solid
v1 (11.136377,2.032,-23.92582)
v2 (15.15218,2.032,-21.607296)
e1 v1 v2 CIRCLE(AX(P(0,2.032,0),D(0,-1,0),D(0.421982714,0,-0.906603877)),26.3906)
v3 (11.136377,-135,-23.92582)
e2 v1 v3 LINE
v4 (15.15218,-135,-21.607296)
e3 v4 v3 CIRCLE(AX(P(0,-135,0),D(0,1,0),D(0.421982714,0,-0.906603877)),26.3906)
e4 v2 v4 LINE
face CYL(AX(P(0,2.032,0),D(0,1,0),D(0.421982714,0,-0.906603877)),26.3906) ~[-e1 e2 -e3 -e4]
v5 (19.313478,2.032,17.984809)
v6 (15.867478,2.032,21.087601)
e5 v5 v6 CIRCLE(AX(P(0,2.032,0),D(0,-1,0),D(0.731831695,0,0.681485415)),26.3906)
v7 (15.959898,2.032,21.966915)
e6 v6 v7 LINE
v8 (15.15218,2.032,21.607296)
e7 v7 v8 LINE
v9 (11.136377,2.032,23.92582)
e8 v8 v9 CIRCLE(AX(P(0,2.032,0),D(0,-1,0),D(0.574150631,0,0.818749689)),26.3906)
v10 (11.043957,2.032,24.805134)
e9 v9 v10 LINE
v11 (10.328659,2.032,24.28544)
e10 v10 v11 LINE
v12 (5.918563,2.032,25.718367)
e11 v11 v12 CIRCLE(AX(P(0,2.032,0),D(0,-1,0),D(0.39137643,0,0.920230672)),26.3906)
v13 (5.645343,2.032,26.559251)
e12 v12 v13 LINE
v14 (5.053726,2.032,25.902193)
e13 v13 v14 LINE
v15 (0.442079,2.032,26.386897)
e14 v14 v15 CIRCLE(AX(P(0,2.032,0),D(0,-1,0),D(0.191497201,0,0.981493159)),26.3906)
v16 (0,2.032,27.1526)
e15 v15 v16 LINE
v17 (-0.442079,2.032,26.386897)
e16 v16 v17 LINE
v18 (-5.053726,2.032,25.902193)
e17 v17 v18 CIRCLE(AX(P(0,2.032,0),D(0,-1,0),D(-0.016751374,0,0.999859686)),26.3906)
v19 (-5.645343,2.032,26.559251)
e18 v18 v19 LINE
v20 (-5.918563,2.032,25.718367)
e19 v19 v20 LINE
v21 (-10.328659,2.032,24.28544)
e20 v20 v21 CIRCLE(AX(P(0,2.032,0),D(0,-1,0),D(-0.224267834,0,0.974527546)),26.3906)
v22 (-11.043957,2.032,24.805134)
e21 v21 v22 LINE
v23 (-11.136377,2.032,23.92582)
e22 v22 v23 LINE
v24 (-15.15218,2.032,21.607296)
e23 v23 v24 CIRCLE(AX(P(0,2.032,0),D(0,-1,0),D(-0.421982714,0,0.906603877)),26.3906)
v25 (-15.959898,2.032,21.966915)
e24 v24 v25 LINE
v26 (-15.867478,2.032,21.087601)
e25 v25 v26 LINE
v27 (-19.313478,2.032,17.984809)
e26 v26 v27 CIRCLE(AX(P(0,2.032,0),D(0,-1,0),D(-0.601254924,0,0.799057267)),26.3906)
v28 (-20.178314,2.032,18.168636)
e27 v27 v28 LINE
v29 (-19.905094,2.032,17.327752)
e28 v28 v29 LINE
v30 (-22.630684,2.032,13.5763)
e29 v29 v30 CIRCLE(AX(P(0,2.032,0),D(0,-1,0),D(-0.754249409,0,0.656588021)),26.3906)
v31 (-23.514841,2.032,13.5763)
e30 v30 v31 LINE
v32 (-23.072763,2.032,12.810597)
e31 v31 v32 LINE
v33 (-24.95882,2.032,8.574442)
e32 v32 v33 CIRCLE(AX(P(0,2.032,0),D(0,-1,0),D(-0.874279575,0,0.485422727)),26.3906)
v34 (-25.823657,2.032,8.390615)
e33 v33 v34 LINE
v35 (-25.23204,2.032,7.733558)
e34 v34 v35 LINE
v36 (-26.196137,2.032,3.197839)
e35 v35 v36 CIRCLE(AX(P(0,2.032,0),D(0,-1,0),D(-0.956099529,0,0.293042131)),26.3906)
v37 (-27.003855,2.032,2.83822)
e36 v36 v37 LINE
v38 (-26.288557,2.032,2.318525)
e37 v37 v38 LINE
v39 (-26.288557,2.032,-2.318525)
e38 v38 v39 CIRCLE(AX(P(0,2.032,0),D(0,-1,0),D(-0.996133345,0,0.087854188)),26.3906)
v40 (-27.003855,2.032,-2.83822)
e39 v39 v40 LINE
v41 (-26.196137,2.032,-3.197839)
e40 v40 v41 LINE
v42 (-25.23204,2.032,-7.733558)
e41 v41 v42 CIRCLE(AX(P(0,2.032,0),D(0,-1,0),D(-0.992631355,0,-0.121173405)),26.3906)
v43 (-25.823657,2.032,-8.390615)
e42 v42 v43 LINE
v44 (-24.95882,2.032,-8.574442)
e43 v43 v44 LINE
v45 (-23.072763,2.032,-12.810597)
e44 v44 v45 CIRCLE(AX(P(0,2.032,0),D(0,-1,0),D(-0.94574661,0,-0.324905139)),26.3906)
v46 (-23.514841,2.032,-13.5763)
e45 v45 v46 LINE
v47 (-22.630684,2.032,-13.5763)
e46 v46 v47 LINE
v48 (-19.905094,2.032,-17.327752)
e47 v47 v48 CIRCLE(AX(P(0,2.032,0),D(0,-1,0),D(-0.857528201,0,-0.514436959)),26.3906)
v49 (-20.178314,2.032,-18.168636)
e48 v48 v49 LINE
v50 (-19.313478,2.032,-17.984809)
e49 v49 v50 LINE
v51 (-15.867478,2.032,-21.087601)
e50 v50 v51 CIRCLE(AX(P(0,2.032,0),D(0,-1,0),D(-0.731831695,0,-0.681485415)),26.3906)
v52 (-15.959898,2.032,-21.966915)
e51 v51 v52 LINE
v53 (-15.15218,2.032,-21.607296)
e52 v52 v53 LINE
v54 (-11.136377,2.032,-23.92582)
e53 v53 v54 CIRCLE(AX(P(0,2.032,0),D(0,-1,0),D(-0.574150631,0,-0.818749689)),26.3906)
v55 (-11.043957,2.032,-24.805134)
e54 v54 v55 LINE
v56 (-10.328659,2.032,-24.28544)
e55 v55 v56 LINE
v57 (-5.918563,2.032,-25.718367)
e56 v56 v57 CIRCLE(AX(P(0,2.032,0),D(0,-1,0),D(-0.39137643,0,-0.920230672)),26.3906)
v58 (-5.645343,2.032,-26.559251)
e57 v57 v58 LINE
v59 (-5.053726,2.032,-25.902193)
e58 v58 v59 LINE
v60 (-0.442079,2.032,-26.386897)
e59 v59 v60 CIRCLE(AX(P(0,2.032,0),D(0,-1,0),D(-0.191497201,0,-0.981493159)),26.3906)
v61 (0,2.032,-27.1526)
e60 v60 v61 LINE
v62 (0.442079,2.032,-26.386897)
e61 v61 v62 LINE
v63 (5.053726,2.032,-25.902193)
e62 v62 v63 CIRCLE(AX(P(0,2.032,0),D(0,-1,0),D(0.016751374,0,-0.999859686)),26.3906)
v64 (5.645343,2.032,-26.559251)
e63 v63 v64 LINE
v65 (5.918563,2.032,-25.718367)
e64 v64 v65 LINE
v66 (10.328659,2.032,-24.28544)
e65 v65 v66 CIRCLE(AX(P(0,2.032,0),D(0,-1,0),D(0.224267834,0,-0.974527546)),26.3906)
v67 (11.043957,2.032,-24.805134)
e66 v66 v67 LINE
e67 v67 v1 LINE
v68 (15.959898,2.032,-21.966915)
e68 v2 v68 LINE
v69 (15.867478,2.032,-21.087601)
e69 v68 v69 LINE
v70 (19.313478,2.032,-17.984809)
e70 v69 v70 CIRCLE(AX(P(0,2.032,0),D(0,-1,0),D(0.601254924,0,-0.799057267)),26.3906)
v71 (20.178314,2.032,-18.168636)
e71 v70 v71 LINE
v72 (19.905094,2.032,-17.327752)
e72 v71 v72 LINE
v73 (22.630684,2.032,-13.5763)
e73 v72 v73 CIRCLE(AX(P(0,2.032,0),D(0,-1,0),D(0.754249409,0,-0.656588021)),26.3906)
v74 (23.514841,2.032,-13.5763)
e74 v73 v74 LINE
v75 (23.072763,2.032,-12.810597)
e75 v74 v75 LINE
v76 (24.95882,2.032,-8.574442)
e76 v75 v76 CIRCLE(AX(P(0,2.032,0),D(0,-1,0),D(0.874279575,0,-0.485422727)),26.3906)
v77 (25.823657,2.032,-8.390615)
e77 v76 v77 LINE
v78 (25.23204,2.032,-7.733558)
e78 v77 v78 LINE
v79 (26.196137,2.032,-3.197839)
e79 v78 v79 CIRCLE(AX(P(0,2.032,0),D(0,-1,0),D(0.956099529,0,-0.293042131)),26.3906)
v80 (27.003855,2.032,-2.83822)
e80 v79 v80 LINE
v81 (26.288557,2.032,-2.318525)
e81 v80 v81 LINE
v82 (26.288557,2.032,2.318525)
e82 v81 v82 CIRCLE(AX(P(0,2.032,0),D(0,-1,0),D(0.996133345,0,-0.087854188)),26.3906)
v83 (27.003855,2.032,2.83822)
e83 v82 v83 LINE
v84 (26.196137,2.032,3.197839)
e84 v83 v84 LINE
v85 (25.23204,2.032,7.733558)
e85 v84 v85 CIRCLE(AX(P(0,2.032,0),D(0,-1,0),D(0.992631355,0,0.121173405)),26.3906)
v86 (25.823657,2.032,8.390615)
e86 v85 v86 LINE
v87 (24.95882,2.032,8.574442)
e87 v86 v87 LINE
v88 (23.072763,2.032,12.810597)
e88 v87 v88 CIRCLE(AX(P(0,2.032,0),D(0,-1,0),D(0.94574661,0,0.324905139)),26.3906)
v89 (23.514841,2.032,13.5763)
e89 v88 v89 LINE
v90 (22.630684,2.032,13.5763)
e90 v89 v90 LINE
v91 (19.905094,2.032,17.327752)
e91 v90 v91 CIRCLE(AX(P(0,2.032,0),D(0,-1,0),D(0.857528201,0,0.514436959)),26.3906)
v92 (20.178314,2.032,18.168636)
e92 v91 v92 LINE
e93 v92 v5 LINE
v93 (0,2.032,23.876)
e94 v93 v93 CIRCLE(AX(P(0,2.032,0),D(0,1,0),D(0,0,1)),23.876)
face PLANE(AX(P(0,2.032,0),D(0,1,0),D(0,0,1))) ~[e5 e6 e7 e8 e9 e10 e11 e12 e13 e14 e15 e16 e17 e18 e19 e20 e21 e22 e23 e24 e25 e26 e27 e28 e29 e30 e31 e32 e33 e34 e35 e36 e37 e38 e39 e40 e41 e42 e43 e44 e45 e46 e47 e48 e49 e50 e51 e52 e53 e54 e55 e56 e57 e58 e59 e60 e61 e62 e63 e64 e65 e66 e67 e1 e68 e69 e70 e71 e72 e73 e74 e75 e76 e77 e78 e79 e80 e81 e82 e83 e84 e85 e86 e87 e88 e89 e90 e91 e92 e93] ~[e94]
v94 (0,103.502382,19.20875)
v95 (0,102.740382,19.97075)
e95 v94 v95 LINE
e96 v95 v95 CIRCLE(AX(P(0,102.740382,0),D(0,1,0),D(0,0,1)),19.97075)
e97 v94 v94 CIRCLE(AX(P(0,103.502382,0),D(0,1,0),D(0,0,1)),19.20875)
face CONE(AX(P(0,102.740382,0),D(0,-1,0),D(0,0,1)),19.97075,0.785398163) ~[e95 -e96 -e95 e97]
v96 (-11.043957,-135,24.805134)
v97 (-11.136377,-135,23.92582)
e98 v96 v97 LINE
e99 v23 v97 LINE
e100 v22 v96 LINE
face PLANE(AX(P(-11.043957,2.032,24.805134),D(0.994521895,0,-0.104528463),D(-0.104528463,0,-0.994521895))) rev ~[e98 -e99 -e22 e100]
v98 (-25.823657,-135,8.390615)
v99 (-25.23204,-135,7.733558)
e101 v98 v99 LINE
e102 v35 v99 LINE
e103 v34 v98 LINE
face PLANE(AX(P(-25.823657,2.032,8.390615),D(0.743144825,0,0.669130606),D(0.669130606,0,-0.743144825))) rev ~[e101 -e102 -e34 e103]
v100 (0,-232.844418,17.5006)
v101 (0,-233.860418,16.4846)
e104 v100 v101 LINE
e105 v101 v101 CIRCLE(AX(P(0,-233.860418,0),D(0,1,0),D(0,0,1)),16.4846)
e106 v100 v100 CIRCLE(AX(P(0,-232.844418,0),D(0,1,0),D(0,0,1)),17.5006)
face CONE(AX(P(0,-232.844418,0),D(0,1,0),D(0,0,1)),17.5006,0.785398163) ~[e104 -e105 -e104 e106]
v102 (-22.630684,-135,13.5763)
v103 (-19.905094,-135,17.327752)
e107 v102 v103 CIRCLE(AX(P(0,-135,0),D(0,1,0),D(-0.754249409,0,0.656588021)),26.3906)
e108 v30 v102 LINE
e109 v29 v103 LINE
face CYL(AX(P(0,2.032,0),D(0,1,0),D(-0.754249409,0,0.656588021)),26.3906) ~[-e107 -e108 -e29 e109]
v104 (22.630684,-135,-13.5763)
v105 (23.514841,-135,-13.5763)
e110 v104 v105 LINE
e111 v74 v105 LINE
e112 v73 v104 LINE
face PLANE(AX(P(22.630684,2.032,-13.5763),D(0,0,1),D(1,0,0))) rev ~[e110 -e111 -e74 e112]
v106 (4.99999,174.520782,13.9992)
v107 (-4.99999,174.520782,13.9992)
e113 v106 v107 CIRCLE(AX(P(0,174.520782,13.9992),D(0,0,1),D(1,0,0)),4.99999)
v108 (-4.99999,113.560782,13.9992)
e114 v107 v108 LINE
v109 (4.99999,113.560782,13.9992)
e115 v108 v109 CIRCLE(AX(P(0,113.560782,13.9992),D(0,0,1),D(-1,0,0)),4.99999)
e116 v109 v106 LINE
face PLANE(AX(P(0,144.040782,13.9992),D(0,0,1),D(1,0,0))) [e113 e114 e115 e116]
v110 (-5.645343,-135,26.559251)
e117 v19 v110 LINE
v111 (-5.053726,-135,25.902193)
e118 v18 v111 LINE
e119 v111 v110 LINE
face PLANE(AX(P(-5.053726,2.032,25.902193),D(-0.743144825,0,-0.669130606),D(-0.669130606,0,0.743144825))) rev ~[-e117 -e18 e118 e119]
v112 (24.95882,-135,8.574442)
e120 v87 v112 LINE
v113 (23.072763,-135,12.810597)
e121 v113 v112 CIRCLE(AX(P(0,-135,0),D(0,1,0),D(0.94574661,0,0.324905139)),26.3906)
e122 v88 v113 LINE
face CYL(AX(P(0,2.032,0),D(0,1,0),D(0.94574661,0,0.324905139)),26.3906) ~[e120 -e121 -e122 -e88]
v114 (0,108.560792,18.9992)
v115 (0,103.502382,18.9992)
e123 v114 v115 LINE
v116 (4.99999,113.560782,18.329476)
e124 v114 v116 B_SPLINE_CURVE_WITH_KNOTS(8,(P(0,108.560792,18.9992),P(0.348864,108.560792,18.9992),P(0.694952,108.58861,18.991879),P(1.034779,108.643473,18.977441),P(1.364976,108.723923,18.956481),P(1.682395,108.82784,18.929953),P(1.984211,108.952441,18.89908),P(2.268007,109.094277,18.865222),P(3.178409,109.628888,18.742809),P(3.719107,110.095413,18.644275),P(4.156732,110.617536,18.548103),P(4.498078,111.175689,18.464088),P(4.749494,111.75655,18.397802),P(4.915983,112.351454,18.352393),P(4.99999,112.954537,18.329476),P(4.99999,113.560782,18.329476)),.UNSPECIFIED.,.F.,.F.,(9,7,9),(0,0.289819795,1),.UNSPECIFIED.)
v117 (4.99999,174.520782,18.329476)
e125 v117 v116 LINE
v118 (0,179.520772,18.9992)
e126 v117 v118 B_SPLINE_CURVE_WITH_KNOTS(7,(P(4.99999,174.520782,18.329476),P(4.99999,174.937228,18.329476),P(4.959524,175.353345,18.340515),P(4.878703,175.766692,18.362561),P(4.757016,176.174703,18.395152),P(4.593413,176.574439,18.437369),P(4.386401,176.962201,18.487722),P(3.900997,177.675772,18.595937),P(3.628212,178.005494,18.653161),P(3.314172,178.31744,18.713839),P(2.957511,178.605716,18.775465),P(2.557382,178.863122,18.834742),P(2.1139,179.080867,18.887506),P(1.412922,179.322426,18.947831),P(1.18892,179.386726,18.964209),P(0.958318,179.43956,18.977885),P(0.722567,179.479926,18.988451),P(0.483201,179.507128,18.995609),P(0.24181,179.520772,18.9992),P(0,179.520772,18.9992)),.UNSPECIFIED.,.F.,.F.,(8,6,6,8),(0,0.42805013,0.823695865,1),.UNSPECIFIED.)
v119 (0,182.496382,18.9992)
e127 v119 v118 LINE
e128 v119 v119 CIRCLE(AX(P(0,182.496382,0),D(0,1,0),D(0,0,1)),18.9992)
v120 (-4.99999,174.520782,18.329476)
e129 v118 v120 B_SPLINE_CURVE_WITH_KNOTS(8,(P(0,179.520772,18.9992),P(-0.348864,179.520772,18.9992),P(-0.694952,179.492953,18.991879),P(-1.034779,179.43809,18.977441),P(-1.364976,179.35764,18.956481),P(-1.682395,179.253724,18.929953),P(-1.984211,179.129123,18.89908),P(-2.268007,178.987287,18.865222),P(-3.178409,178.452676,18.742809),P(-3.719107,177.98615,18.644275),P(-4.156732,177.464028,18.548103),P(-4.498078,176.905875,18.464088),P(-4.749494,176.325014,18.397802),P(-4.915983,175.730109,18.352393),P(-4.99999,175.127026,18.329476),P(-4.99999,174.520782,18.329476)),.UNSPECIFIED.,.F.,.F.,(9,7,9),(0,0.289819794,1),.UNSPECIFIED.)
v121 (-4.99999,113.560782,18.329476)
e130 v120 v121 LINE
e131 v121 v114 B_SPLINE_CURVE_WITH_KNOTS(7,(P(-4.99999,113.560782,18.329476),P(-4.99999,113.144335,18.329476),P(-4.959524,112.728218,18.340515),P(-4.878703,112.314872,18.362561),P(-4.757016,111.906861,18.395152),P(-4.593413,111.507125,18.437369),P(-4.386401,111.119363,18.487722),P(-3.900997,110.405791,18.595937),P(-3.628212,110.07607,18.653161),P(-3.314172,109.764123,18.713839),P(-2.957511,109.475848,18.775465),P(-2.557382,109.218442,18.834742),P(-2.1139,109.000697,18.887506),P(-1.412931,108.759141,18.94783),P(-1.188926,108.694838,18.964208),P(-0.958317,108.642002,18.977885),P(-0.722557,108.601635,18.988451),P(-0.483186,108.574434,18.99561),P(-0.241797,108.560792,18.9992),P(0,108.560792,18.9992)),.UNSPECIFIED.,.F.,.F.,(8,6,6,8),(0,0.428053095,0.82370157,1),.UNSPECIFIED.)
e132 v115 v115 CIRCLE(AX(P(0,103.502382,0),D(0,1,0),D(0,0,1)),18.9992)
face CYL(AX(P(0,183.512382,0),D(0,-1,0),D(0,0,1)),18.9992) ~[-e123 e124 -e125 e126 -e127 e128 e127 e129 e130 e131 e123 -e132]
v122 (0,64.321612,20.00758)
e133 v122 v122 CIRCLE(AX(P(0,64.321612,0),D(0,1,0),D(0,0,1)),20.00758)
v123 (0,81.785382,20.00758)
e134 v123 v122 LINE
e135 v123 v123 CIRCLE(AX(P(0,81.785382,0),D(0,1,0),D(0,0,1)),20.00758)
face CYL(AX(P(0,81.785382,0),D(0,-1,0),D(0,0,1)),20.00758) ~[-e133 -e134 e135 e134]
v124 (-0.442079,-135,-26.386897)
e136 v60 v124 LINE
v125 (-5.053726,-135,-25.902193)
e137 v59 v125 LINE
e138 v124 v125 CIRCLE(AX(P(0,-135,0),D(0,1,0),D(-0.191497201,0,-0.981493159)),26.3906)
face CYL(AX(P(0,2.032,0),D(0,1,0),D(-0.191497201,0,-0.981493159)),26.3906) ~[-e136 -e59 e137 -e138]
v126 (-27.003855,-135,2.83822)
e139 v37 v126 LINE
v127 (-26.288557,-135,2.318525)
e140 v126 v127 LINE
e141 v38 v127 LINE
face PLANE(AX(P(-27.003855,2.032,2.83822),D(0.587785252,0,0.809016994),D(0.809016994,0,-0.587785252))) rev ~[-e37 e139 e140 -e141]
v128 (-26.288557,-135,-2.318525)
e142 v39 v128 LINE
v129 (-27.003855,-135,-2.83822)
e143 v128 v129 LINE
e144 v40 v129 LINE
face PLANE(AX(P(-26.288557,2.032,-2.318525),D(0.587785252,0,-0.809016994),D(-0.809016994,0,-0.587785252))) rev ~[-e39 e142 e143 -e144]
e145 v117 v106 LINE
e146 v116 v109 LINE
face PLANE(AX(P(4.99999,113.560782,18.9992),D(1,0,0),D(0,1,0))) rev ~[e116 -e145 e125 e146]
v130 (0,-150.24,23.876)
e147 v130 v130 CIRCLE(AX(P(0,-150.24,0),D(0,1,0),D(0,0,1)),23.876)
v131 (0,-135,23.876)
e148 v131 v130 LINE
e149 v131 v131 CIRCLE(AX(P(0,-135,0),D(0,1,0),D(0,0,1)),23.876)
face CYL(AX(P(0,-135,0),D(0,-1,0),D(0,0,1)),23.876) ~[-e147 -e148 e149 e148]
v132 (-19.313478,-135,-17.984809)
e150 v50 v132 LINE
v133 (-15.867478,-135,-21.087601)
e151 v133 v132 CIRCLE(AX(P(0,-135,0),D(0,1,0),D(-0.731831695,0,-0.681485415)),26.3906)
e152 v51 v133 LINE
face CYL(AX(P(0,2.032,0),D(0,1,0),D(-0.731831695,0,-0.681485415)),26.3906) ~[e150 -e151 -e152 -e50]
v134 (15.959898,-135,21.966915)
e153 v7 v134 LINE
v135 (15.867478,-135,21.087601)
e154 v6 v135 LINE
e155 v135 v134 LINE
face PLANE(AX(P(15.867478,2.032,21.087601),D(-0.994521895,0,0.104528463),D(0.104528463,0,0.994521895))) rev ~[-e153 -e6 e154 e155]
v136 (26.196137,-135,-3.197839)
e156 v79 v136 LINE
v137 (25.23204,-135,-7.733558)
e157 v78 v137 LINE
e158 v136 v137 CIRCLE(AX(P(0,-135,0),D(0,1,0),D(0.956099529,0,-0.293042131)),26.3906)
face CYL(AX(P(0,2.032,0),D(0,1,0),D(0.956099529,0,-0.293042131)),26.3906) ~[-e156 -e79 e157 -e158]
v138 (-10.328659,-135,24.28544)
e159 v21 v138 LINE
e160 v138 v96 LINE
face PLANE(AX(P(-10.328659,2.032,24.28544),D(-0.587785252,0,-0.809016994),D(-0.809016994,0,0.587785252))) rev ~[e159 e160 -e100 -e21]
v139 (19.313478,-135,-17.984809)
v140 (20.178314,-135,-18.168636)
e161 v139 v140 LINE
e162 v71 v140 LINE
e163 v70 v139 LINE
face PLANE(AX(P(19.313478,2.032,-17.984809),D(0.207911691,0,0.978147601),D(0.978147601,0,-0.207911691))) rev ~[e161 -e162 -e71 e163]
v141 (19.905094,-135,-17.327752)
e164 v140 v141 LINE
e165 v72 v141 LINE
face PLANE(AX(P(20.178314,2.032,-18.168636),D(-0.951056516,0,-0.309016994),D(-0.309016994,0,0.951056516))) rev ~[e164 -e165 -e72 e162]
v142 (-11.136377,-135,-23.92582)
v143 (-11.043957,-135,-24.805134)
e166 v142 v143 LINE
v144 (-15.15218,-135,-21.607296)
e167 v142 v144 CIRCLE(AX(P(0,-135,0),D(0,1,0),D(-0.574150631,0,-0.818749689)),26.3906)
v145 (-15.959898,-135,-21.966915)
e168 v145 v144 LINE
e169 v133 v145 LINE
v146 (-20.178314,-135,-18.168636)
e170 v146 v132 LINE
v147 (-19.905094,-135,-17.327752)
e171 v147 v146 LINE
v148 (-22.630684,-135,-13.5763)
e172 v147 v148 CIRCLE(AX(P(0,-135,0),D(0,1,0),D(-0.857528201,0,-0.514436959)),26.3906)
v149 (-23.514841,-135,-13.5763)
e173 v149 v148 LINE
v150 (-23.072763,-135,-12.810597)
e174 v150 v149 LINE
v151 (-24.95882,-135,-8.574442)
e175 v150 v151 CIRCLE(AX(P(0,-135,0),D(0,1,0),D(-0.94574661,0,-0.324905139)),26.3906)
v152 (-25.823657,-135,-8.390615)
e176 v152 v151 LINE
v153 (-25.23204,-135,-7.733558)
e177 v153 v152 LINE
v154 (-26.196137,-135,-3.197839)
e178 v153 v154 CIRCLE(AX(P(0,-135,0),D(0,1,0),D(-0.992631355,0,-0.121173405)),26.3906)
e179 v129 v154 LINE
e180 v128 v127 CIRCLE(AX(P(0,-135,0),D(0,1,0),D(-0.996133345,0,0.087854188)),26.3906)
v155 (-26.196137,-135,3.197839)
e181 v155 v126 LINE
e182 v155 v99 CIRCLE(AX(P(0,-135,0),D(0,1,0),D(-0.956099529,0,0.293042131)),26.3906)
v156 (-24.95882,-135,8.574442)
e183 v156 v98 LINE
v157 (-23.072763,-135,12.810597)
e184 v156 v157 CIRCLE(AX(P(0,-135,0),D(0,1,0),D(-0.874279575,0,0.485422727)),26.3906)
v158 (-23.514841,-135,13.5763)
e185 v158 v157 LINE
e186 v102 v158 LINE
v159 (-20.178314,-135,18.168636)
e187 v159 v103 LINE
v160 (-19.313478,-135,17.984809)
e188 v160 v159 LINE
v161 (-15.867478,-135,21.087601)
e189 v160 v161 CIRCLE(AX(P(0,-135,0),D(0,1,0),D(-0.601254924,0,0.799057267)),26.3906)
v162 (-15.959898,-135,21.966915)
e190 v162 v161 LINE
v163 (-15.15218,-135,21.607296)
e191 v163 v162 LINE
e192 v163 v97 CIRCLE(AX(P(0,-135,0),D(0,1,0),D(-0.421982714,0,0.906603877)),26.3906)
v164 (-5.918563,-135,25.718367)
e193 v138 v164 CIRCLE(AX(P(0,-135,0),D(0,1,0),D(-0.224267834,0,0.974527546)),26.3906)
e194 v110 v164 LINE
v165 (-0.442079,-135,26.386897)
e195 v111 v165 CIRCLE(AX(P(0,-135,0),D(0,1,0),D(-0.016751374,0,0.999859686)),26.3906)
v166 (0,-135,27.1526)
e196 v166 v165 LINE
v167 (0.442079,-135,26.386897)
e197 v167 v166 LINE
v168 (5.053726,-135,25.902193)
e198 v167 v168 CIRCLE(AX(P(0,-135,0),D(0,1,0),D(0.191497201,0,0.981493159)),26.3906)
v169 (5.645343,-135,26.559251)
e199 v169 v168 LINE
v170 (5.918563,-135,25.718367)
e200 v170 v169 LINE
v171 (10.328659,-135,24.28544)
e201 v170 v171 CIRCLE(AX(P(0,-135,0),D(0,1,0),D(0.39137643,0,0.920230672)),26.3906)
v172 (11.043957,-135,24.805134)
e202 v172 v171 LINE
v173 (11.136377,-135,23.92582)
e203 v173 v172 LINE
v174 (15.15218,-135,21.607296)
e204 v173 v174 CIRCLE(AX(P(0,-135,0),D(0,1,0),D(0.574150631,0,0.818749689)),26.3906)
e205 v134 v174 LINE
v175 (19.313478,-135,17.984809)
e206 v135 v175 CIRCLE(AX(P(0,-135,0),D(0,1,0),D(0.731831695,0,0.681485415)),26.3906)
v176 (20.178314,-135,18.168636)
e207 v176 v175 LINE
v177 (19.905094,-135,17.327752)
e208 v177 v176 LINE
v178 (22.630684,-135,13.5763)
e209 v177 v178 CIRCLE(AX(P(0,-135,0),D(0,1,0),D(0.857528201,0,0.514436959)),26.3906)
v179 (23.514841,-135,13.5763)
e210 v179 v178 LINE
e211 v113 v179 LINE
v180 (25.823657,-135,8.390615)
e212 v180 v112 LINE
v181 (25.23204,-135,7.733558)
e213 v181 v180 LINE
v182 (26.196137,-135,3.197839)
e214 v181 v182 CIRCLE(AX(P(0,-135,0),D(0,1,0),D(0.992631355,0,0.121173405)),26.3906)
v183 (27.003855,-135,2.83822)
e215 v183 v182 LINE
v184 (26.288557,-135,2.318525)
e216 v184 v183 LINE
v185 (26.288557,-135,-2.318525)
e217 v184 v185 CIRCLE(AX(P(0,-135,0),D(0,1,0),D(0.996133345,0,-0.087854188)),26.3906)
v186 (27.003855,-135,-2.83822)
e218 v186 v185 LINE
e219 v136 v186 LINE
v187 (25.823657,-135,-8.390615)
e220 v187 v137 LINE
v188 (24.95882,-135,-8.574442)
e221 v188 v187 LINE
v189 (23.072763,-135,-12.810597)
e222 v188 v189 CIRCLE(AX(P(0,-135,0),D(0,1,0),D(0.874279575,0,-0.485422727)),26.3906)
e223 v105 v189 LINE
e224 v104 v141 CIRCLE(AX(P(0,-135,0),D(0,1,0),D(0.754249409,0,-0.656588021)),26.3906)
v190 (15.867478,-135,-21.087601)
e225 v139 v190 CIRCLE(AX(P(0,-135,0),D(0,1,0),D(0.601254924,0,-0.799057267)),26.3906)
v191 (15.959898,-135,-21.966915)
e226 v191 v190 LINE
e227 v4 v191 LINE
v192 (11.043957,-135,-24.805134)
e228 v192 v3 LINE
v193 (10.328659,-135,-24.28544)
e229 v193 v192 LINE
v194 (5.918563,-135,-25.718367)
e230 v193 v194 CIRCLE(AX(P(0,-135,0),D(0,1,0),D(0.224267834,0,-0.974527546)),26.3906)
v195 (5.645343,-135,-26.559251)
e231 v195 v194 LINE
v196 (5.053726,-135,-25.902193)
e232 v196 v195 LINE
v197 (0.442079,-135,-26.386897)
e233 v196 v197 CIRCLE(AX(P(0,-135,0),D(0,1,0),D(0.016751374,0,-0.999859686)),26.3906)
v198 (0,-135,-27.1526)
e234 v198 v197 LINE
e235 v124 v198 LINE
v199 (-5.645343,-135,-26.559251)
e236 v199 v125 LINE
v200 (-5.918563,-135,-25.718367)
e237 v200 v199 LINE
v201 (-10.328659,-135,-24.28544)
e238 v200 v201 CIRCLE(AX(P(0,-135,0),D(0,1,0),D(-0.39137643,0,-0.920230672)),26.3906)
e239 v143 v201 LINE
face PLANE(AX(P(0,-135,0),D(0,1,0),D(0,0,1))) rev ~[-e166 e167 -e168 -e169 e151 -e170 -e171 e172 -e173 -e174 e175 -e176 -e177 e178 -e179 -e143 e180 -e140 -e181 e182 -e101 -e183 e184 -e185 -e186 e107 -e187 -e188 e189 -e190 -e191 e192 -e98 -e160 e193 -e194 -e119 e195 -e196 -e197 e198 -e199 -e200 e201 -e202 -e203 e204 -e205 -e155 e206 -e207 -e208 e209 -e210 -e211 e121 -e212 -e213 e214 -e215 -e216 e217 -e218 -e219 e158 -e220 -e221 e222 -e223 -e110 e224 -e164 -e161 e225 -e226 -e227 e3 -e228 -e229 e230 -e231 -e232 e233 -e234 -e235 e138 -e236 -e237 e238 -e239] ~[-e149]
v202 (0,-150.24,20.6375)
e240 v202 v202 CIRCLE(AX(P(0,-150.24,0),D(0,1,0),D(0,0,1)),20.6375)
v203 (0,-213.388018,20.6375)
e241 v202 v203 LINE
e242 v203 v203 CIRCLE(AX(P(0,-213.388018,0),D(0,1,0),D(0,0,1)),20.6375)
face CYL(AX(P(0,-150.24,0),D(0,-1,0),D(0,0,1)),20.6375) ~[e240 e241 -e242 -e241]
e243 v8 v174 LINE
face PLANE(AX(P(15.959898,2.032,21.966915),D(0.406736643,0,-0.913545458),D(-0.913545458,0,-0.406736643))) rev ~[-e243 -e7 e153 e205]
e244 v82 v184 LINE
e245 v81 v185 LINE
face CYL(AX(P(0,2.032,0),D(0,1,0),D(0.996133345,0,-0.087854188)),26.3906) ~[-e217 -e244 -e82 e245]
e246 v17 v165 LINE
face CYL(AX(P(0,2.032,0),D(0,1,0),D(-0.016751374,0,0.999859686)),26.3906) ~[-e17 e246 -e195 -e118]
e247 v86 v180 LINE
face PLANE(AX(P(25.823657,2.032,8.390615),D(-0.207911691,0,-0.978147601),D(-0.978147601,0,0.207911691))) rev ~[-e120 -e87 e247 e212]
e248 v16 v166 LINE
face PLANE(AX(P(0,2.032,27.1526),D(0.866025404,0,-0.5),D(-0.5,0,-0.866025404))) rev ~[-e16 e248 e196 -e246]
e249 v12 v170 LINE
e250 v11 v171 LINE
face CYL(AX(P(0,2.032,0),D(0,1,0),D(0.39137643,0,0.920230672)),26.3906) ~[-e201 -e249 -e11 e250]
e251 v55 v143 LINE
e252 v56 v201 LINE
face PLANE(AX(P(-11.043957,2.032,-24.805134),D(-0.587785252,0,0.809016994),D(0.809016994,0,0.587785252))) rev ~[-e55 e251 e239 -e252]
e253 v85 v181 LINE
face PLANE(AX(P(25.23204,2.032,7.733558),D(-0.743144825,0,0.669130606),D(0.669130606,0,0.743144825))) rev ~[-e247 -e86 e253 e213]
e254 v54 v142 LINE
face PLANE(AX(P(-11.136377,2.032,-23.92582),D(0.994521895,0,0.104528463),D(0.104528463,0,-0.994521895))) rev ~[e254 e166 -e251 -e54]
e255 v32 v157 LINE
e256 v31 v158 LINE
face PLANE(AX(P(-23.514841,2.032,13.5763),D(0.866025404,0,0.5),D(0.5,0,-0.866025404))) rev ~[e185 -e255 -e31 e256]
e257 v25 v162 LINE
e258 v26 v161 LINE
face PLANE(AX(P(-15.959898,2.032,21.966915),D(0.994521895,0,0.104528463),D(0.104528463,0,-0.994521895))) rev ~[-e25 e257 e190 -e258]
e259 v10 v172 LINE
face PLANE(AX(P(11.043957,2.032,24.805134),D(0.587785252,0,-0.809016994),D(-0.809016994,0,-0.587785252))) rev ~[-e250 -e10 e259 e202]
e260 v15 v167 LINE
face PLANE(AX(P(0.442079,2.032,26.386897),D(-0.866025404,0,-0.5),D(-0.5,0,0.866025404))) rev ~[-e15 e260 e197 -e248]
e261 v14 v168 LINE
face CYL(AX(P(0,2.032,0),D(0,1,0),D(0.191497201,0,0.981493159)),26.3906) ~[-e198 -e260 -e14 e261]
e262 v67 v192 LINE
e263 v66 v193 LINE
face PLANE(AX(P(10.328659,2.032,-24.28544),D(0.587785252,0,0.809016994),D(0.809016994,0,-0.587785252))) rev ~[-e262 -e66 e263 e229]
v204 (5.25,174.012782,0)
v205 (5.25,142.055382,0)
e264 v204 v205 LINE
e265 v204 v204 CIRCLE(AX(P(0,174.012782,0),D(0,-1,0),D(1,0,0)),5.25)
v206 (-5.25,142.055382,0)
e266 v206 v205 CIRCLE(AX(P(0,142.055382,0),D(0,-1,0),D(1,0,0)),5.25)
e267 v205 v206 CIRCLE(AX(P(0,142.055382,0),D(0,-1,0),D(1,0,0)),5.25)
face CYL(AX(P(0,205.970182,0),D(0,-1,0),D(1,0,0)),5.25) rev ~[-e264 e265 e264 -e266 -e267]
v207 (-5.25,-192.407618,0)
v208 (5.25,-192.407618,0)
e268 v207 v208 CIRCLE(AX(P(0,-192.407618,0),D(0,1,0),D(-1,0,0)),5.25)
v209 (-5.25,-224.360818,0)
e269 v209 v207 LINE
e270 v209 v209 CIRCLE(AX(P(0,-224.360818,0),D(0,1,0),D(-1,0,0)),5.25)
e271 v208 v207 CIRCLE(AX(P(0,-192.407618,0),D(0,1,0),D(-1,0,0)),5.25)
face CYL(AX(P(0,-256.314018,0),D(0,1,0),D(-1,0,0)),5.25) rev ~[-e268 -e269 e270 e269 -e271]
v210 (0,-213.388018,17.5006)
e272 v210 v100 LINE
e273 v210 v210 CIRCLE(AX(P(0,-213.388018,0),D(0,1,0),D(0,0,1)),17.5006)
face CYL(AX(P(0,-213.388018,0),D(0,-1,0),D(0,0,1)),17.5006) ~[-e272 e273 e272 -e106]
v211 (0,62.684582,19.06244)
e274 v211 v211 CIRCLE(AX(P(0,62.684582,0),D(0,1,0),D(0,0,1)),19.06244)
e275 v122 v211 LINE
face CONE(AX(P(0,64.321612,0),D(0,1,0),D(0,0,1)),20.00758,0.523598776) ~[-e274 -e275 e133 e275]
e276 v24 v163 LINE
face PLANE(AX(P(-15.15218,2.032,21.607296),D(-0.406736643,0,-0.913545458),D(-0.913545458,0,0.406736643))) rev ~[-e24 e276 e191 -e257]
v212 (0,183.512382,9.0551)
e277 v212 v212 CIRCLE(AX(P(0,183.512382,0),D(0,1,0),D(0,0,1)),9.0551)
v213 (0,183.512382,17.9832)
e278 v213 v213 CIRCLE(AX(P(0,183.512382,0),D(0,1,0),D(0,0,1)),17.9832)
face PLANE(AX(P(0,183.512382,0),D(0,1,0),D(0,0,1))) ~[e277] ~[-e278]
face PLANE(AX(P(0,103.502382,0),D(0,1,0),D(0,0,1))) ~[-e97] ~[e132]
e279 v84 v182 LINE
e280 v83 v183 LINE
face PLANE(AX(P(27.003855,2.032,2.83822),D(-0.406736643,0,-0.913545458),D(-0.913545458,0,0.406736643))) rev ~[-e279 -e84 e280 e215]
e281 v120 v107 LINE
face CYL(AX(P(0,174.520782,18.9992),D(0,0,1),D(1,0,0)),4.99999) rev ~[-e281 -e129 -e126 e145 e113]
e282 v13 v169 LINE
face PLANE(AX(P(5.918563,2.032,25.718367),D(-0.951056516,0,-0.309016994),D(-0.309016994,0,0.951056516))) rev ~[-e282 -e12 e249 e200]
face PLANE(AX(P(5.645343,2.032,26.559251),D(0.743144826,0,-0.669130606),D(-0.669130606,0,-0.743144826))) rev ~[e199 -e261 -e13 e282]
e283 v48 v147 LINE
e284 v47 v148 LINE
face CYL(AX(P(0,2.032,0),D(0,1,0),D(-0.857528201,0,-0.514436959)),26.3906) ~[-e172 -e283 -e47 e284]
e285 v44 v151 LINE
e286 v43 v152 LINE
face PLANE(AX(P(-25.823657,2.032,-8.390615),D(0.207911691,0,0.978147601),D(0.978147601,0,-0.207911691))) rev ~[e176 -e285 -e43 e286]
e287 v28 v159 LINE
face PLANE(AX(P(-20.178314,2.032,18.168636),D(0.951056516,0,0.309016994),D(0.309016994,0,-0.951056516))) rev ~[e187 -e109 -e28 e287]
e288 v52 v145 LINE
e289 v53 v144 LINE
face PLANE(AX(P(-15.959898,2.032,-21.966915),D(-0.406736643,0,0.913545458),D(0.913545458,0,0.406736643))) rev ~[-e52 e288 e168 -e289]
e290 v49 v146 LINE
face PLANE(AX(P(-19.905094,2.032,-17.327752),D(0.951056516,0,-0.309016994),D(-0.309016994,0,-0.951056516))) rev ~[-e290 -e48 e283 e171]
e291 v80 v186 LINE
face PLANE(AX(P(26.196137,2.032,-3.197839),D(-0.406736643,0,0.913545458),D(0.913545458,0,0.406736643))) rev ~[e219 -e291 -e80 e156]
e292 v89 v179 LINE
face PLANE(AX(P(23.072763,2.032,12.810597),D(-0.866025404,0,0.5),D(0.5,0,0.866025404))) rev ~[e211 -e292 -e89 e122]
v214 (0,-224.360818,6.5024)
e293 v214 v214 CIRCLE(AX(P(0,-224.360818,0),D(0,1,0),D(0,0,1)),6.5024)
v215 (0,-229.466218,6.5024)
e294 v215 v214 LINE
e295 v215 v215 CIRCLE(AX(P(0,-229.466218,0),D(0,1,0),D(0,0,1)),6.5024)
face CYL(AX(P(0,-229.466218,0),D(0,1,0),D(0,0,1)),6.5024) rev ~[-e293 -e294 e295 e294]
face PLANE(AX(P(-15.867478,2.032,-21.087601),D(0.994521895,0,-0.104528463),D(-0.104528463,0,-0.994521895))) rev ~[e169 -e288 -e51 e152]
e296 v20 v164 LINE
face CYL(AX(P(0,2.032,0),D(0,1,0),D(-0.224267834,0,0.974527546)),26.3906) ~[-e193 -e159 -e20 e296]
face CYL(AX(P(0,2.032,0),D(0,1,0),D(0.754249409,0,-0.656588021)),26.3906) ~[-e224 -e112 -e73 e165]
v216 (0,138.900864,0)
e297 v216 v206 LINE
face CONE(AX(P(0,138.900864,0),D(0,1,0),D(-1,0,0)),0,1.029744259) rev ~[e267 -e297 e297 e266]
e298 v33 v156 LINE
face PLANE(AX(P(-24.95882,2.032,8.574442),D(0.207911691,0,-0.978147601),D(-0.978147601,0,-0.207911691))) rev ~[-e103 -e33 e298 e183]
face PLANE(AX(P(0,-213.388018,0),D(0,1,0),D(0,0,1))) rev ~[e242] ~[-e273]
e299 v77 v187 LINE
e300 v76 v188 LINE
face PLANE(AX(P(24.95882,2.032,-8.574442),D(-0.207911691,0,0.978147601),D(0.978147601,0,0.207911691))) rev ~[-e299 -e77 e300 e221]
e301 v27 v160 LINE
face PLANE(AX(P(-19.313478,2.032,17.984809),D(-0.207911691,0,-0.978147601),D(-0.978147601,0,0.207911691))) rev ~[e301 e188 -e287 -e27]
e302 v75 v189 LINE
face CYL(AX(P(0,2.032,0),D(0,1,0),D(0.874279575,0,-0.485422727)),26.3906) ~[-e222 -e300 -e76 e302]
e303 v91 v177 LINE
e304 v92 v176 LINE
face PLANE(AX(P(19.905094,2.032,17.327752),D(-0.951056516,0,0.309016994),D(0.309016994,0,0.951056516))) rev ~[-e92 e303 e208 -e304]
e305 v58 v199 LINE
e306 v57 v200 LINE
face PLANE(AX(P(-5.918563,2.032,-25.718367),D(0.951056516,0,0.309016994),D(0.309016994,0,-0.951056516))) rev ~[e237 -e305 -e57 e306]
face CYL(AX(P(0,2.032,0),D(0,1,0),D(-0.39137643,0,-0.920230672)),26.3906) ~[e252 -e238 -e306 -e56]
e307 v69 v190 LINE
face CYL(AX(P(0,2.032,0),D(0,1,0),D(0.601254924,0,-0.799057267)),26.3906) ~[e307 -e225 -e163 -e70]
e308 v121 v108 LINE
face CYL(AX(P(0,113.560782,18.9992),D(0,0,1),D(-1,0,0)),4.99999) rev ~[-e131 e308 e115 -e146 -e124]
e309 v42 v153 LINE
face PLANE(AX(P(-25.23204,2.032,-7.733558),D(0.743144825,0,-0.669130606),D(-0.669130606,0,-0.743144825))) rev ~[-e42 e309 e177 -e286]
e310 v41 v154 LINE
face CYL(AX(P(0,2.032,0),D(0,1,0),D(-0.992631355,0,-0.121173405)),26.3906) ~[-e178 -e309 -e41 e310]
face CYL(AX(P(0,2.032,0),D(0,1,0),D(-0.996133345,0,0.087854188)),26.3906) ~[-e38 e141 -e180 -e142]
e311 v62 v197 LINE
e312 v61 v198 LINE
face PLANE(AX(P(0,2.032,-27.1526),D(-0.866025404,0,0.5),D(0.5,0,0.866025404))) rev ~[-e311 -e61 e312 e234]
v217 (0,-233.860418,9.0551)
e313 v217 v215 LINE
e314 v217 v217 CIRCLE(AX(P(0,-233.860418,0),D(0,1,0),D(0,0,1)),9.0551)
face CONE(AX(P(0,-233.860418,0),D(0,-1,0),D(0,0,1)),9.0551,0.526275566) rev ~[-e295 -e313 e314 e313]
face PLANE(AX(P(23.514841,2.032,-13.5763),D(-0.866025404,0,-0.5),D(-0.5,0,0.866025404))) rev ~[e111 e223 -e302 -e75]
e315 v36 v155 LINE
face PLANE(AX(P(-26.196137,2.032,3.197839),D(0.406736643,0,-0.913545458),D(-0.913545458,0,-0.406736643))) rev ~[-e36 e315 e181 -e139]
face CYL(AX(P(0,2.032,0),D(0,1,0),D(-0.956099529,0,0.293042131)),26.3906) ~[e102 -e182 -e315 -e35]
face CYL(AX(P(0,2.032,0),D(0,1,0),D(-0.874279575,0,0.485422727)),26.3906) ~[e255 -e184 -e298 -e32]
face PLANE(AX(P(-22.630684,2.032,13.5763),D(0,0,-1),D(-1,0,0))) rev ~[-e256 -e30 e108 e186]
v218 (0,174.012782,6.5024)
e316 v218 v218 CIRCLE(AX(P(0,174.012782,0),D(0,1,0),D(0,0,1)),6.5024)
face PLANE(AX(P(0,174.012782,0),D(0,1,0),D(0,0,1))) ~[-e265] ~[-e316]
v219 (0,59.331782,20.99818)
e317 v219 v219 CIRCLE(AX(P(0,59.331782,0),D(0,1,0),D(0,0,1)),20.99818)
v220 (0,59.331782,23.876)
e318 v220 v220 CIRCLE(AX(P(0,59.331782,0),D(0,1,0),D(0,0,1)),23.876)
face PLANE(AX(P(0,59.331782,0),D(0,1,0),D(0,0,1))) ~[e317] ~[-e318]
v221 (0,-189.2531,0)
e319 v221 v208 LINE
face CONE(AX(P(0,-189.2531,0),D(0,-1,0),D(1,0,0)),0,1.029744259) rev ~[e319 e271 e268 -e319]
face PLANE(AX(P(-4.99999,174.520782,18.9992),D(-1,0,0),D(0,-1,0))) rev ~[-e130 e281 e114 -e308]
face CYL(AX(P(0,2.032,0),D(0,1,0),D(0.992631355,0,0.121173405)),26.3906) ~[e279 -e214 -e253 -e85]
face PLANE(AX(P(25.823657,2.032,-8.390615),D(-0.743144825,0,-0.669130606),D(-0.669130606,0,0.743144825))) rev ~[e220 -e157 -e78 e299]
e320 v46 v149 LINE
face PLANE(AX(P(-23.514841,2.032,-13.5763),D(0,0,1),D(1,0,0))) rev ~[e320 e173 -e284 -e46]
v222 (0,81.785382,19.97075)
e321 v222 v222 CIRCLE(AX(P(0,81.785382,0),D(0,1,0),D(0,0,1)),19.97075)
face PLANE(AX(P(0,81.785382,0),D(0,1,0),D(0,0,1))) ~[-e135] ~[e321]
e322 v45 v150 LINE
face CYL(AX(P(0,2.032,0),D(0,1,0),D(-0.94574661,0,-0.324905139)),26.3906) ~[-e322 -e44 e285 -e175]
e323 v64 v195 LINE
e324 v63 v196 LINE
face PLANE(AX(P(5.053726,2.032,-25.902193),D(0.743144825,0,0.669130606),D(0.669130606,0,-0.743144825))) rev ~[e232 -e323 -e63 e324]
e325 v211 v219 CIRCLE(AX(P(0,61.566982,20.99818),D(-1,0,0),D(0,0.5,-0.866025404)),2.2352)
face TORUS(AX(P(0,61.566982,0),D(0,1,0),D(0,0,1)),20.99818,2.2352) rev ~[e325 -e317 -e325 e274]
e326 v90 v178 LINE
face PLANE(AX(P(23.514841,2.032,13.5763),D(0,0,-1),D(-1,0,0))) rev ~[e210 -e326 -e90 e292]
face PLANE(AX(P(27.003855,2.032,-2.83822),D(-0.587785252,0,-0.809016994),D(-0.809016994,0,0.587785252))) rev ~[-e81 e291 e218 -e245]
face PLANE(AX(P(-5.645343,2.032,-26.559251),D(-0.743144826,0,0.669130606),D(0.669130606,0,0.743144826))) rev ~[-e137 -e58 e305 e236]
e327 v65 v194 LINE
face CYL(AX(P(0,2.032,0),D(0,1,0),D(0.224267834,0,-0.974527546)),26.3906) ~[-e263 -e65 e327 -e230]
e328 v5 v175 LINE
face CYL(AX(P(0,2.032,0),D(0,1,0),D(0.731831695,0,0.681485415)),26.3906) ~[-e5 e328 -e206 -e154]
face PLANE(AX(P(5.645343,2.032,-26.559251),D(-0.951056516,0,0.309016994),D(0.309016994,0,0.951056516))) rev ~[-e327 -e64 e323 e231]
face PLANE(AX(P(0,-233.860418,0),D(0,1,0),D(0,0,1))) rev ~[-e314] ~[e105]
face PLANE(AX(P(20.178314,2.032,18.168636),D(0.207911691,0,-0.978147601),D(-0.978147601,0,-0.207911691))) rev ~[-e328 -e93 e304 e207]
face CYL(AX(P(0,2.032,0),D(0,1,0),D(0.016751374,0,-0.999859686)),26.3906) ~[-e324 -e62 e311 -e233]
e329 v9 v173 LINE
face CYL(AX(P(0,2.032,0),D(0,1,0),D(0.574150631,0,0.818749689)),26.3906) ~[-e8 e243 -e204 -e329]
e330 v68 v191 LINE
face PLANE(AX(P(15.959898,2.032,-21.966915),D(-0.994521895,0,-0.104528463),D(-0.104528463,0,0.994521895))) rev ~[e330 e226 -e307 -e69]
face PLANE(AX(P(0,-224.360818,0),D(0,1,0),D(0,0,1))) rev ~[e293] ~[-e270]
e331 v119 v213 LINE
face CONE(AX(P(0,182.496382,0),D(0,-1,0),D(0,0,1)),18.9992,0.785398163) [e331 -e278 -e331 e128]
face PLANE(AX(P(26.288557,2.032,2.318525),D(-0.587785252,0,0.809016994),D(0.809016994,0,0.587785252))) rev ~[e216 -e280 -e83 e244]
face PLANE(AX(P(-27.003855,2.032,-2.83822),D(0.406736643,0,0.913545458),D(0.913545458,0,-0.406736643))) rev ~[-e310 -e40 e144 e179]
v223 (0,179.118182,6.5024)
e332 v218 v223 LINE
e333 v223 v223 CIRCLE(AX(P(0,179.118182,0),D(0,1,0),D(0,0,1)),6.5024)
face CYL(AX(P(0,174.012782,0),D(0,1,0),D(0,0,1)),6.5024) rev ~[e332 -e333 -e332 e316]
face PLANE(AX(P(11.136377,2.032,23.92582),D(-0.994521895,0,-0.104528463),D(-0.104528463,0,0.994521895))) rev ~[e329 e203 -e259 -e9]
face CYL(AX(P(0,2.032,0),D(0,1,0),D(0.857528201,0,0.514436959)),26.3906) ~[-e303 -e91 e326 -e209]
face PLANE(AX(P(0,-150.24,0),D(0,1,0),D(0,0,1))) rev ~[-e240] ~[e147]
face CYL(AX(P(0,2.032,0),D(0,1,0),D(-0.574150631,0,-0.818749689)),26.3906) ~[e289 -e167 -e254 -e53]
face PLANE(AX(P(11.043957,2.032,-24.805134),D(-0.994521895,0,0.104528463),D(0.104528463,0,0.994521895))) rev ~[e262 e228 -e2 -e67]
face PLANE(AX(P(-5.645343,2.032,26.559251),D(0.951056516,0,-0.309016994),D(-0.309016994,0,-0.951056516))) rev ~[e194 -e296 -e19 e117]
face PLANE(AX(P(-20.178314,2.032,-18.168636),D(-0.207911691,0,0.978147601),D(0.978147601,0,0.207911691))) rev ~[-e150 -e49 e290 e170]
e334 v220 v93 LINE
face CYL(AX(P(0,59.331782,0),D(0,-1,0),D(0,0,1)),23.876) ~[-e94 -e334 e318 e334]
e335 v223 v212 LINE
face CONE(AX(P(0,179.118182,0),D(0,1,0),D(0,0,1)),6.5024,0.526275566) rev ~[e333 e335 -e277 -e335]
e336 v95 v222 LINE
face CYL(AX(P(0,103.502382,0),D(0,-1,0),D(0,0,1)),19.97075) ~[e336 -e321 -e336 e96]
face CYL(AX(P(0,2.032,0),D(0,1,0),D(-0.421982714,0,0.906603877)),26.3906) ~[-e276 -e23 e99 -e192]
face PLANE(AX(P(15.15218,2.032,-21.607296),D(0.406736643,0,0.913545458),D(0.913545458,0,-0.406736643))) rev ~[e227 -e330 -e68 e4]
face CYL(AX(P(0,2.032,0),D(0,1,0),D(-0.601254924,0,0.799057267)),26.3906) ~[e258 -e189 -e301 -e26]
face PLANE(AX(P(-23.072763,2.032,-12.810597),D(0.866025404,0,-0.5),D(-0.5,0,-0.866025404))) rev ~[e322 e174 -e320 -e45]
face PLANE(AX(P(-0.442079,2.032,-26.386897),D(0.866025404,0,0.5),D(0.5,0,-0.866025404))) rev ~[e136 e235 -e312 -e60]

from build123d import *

# Parameters (mm, degrees)
F3_DEPTH        = 235.8934182005
F3_COPIES_COUNT = 30
F6_DEPTH        = 5
F7_SIZE         = 1.016
F10_D           = 10.5
F10_DEPTH       = 31.9574
F10_TIP         = 3.1545182499
F11_SIZE        = 0.762
F14_D           = 10.5
F14_DEPTH       = 31.9532
F14_TIP         = 3.1545182499


# Not quite as in the source:
# - a pattern or mirror of a feature is missing from the dataset's text; its kind, count and spacing are read off the source's solid


with BuildPart() as f1:
    # F0 (on Right) → F1 (revolve)
    with BuildSketch(Plane.YZ):
        with BuildLine():
            Line((59.3317817995, 23.876), (2.032, 23.876))
            Line((2.032, 23.876), (2.032, 27.1526))
            Line((2.032, 27.1526), (0, 27.1526))
            Line((0, 27.1526), (-135, 27.1526))
            Line((-135, 27.1526), (-135, 23.876))
            Line((-135, 23.876), (-150.24, 23.876))
            Line((-150.24, 23.876), (-150.24, 20.6375))
            Line((-150.24, 20.6375), (-213.3880182005, 20.6375))
            Line((-213.3880182005, 20.6375), (-213.3880182005, 17.5006))
            Line((-213.3880182005, 17.5006), (-233.8604182005, 17.5006))
            Line((-233.8604182005, 17.5006), (-233.8604182005, 9.0551))
            Line((-233.8604182005, 9.0551), (-229.4662182005, 6.5024))
            Line((-229.4662182005, 6.5024), (-224.3608182005, 6.5024))
            Line((-224.3608182005, 6.5024), (-224.3608182005, 0))
            Line((-224.3608182005, 0), (174.0127817995, 0))
            Line((174.0127817995, 0), (174.0127817995, 6.5024))
            Line((174.0127817995, 6.5024), (179.1181817995, 6.5024))
            Line((179.1181817995, 6.5024), (183.5123817995, 9.0551))
            Line((183.5123817995, 9.0551), (183.5123817995, 18.9992))
            Line((183.5123817995, 18.9992), (103.5023817995, 18.9992))
            Line((103.5023817995, 18.9992), (103.5023817995, 19.97075))
            Line((103.5023817995, 19.97075), (81.7853817995, 19.97075))
            Line((81.7853817995, 19.97075), (81.7853817995, 20.00758))
            Line((81.7853817995, 20.00758), (64.3216122695, 20.00758))
            Line((64.3216122695, 20.00758), (62.6845817995, 19.0624400175))
            ThreePointArc((62.6845817995, 19.0624400175), (60.4493817995, 19.0624400175), (59.3317817995, 20.99818))
            Line((59.3317817995, 20.99818), (59.3317817995, 23.876))
        make_face()
    revolve(axis=Axis((0, -25.1740182005, 0), (0, 1, 0)))

    # F2 (on face) → F3 (cut, through all)
    with BuildSketch(Plane(origin=(0, 2.032, 0), x_dir=(-1, 0, 0), z_dir=(0, 1, 0))):
        with BuildLine():
            Line((-0.442078818, 26.3868970263), (0, 27.1526))
            ThreePointArc((0, 27.1526), (-2.8382195517, 27.0038552162), (-5.6453429761, 26.5592505437))
            Line((-5.6453429761, 26.5592505437), (-5.0537260411, 25.9021933716))
            ThreePointArc((-5.0537260411, 25.9021933716), (-2.7585688627, 26.2460295319), (-0.442078818, 26.3868970263))
        make_face()
    f3 = extrude(amount=-F3_DEPTH, mode=Mode.SUBTRACT)

    # F3_copies: F3 ×30 about axis
    f3_copies_axis = Axis((0, 0, 0), (0, 1, 0))
    for i in range(1, F3_COPIES_COUNT):
        add(f3.rotate(f3_copies_axis, i * 360 / F3_COPIES_COUNT), mode=Mode.SUBTRACT)

    # F5 (on offset) → F6 (cut)
    with BuildSketch(Plane.XY.offset(18.9992)):
        with BuildLine():
            Line((-4.99999, 174.5207817995), (-4.99999, 113.5607817995))
            ThreePointArc((-4.99999, 113.5607817995), (0, 108.5607917995), (4.99999, 113.5607817995))
            Line((4.99999, 113.5607817995), (4.99999, 174.5207817995))
            ThreePointArc((4.99999, 174.5207817995), (0, 179.5207717995), (-4.99999, 174.5207817995))
        make_face()
    extrude(amount=-F6_DEPTH, mode=Mode.SUBTRACT)

    # F7
    f7_edges = [f1.edges().sort_by_distance(p)[0] for p in [
        (0, 183.512382, -18.9992),
        (0, -233.860418, -17.5006),
    ]]
    chamfer(f7_edges, length=F7_SIZE)

    # F10
    with Locations(Plane(origin=(0, 174.0127817995, 0), x_dir=(-1, 0, 0), z_dir=(0, 1, 0))):
        with Locations((0, 0)):
            Hole(F10_D / 2, depth=F10_DEPTH)
            with Locations((0, 0, -(F10_DEPTH + F10_TIP / 2))):  # 118° drill point
                Cone(0, F10_D / 2, F10_TIP, mode=Mode.SUBTRACT)

    # F11
    f11_edges = [f1.edges().sort_by_distance(p)[0] for p in [
        (0, 103.502382, -19.97075),
    ]]
    chamfer(f11_edges, length=F11_SIZE)

    # F14
    with Locations(Plane.XZ.offset(224.3608182005)):
        with Locations((0, 0)):
            Hole(F14_D / 2, depth=F14_DEPTH)
            with Locations((0, 0, -(F14_DEPTH + F14_TIP / 2))):  # 118° drill point
                Cone(0, F14_D / 2, F14_TIP, mode=Mode.SUBTRACT)


solid = f1.part
